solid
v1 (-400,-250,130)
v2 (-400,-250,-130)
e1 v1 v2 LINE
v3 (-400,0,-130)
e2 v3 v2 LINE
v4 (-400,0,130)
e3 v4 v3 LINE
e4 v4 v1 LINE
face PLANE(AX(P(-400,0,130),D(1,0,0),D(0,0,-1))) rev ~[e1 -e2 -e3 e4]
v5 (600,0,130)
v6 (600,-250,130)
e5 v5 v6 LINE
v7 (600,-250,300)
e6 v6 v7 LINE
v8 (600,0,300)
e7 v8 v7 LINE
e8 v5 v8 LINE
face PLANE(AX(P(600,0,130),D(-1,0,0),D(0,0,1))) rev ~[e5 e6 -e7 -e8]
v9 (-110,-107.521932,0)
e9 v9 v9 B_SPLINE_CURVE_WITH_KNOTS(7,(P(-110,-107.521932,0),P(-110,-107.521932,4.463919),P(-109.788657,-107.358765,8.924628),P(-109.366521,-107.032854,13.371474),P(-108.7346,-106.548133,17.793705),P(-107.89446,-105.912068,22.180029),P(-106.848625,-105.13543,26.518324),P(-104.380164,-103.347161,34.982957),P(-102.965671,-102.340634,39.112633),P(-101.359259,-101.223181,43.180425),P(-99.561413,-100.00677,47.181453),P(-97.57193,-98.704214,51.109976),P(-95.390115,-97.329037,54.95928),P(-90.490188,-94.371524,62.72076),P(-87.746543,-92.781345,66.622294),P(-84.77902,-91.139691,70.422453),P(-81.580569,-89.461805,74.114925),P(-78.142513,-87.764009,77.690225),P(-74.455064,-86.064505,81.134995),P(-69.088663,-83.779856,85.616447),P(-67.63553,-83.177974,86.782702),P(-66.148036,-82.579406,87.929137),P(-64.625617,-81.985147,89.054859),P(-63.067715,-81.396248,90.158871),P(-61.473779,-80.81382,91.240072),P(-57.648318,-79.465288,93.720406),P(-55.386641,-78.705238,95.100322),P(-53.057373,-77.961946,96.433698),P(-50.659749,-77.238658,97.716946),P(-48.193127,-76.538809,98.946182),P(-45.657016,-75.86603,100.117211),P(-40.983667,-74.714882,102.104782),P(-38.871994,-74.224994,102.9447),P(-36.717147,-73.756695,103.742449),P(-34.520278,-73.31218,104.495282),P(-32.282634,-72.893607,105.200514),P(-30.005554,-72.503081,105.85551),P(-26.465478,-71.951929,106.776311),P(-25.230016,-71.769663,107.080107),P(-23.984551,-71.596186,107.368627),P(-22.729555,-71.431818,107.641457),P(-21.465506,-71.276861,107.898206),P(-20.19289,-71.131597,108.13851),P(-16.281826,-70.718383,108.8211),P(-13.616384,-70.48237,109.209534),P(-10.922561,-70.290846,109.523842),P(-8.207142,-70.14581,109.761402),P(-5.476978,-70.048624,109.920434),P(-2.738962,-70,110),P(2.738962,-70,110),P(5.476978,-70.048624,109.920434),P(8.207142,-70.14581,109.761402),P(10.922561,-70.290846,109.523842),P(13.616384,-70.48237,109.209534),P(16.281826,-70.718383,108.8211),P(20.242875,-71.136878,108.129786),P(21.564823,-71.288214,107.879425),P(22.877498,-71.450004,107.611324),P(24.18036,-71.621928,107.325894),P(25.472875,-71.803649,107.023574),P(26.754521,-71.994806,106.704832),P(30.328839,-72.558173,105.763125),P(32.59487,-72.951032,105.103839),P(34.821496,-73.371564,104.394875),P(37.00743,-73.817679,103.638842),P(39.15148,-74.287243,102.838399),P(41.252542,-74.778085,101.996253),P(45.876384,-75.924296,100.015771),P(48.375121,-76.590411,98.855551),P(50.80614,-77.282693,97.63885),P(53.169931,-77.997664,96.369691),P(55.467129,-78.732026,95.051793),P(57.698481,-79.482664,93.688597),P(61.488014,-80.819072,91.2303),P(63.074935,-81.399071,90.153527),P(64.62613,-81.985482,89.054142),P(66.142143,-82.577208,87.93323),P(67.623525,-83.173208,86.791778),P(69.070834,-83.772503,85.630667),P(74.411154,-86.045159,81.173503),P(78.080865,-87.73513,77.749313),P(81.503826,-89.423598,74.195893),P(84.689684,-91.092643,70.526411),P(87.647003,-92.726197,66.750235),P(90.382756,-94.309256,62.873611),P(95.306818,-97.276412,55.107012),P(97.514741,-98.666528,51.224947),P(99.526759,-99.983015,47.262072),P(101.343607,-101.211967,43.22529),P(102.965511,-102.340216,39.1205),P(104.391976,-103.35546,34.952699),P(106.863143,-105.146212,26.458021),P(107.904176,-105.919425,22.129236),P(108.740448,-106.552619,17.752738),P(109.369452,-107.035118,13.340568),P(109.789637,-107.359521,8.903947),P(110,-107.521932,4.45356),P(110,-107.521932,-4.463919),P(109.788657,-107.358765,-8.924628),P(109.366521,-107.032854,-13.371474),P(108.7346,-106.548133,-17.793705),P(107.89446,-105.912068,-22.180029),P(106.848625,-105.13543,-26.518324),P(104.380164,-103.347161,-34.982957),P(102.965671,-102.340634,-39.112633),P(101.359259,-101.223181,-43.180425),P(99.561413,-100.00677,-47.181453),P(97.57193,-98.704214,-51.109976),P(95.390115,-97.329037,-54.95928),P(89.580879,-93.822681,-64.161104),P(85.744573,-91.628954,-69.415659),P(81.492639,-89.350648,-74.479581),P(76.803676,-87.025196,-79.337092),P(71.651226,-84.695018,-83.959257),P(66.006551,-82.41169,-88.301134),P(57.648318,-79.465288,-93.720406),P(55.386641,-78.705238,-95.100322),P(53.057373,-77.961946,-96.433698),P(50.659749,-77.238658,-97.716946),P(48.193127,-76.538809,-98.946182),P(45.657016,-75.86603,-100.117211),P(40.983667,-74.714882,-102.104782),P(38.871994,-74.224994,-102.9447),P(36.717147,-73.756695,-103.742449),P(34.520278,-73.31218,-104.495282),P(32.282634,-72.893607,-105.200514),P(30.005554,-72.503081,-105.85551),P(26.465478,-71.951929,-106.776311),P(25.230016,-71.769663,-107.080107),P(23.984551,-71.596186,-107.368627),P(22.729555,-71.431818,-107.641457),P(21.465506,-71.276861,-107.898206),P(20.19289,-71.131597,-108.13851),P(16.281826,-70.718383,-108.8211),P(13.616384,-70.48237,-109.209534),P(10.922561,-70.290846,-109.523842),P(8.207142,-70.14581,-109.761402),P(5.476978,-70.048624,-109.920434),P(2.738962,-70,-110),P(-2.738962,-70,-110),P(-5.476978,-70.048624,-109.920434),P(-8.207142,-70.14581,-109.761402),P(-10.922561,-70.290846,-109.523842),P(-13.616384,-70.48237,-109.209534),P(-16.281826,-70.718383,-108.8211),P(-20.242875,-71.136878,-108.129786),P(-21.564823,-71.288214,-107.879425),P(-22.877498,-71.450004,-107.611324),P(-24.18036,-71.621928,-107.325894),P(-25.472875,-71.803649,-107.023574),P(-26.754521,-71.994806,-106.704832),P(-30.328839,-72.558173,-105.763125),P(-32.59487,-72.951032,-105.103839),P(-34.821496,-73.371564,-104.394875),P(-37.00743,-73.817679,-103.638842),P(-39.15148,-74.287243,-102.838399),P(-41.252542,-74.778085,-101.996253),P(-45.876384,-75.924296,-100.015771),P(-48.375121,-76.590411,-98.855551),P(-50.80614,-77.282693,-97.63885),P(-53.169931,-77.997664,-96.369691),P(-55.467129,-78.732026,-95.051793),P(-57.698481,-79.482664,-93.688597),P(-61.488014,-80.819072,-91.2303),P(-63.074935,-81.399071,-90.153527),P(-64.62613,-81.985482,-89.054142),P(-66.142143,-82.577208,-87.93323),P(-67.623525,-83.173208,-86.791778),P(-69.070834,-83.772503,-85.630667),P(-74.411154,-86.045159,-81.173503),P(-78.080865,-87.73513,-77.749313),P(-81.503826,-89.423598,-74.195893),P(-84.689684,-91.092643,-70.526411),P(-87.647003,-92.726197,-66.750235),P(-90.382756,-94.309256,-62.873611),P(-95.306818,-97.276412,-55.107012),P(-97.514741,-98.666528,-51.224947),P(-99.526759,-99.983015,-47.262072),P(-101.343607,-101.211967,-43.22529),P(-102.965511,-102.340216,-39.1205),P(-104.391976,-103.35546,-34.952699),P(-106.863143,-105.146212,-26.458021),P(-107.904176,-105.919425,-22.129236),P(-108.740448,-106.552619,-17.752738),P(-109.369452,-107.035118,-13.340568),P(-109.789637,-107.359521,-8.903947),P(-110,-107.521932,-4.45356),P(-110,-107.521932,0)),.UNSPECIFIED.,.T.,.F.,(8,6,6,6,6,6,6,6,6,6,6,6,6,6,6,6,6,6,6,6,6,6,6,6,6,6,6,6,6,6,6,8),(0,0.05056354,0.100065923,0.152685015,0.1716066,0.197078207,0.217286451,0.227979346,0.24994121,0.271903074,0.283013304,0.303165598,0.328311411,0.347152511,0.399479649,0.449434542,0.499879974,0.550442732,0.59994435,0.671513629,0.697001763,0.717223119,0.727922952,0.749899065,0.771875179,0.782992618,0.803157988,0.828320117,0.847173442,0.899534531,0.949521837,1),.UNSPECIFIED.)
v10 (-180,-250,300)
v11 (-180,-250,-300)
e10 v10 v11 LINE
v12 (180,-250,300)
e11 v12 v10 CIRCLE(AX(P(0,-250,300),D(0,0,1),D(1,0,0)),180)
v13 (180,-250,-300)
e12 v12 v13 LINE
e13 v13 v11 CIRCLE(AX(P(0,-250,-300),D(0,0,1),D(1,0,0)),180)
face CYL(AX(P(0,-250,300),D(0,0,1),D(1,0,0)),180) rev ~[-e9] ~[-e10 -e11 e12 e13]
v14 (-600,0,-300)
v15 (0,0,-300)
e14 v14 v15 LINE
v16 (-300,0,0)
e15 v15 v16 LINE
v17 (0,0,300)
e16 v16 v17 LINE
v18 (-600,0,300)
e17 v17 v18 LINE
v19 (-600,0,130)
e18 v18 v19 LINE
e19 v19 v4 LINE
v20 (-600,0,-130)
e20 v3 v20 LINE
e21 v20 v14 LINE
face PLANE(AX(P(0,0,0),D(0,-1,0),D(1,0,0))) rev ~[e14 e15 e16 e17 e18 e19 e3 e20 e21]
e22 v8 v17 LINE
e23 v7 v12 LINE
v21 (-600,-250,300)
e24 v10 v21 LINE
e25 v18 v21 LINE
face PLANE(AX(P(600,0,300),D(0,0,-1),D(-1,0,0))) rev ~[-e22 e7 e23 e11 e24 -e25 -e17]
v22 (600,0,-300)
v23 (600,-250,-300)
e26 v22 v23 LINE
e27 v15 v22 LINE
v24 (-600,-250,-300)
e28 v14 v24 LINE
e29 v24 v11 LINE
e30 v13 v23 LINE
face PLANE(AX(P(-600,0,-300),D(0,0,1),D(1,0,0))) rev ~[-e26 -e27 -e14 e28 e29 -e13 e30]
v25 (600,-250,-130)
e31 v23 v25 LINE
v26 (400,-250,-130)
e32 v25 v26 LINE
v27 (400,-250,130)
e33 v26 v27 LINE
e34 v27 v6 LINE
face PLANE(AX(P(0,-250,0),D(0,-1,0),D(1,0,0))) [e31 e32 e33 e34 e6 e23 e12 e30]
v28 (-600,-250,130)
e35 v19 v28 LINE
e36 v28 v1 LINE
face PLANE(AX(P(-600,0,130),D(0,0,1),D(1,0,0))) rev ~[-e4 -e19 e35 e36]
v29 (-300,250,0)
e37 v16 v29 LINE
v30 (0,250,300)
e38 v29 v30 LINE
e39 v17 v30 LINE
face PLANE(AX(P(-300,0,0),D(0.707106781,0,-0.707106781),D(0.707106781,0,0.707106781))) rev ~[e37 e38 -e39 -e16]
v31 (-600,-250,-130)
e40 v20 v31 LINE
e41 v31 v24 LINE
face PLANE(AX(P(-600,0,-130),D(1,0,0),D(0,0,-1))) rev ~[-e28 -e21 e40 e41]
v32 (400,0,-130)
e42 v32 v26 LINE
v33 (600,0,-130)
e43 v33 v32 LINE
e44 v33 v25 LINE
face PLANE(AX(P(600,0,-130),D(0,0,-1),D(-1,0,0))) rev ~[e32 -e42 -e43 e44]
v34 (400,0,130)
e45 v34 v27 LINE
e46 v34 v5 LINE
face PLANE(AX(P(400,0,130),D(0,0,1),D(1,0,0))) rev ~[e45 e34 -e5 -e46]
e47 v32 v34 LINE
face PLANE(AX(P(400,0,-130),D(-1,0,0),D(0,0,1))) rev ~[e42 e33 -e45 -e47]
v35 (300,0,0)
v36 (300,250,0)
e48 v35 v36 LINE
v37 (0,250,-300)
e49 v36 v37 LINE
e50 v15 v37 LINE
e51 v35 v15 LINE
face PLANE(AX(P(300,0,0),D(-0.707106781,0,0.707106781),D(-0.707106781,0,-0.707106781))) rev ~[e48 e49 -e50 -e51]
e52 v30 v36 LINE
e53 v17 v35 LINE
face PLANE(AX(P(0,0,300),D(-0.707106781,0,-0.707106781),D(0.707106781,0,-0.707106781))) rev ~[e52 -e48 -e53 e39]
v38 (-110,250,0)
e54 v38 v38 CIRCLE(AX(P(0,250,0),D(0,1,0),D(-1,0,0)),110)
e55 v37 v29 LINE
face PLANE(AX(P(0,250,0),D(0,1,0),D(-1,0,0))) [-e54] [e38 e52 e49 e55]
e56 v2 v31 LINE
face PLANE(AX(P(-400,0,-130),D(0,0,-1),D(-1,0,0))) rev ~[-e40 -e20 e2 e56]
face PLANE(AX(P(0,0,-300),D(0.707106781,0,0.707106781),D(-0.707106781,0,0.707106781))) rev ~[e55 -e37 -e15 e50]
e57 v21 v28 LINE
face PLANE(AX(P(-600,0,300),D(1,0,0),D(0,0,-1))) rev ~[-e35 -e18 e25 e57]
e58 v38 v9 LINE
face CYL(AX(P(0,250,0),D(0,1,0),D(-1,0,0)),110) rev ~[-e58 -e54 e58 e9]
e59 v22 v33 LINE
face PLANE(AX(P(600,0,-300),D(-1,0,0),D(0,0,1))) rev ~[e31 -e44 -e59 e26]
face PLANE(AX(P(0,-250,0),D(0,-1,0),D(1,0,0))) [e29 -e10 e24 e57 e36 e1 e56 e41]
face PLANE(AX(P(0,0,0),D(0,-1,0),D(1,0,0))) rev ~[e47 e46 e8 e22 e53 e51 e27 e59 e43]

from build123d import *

# Parameters (mm, degrees)
F1_DEPTH = 250
F3_DEPTH = 600.001
F5_DEPTH = 250
F6_R     = 110
F7_DEPTH = 500.001


# Not quite as in the source:
# - a feature names something its author has since deleted; it is built from what else it names


with BuildPart() as f1:
    # F0 (on Front) → F1 (new body)
    with BuildSketch(Plane.XZ):
        Polygon((-600, -300), (600, -300), (600, -130), (400, -130), (400, 130), (600, 130), (600, 300), (-600, 300), (-600, 130), (-400, 130), (-400, -130), (-600, -130), align=None)
    extrude(amount=F1_DEPTH)

    # F2 (on face) → F3 (cut, through all)
    with BuildSketch(Plane.XY.offset(300)):
        with BuildLine():
            Line((-180, -250), (180, -250))
            ThreePointArc((180, -250), (0, -70), (-180, -250))
        make_face()
    extrude(amount=-F3_DEPTH, mode=Mode.SUBTRACT)

    # F4 (on face) → F5 (join)
    with BuildSketch(Plane(origin=(0, 0, 0), x_dir=(-1, 0, 0), z_dir=(0, 1, 0))):
        Polygon((0, 300), (-300, 0), (0, -300), (300, 0), align=None)
    extrude(amount=F5_DEPTH)

    # F6 (on face) → F7 (cut, through all)
    with BuildSketch(Plane(origin=(0, 250, 0), x_dir=(-1, 0, 0), z_dir=(0, 1, 0))):
        Circle(F6_R)
    extrude(amount=-F7_DEPTH, mode=Mode.SUBTRACT)


solid = f1.part
